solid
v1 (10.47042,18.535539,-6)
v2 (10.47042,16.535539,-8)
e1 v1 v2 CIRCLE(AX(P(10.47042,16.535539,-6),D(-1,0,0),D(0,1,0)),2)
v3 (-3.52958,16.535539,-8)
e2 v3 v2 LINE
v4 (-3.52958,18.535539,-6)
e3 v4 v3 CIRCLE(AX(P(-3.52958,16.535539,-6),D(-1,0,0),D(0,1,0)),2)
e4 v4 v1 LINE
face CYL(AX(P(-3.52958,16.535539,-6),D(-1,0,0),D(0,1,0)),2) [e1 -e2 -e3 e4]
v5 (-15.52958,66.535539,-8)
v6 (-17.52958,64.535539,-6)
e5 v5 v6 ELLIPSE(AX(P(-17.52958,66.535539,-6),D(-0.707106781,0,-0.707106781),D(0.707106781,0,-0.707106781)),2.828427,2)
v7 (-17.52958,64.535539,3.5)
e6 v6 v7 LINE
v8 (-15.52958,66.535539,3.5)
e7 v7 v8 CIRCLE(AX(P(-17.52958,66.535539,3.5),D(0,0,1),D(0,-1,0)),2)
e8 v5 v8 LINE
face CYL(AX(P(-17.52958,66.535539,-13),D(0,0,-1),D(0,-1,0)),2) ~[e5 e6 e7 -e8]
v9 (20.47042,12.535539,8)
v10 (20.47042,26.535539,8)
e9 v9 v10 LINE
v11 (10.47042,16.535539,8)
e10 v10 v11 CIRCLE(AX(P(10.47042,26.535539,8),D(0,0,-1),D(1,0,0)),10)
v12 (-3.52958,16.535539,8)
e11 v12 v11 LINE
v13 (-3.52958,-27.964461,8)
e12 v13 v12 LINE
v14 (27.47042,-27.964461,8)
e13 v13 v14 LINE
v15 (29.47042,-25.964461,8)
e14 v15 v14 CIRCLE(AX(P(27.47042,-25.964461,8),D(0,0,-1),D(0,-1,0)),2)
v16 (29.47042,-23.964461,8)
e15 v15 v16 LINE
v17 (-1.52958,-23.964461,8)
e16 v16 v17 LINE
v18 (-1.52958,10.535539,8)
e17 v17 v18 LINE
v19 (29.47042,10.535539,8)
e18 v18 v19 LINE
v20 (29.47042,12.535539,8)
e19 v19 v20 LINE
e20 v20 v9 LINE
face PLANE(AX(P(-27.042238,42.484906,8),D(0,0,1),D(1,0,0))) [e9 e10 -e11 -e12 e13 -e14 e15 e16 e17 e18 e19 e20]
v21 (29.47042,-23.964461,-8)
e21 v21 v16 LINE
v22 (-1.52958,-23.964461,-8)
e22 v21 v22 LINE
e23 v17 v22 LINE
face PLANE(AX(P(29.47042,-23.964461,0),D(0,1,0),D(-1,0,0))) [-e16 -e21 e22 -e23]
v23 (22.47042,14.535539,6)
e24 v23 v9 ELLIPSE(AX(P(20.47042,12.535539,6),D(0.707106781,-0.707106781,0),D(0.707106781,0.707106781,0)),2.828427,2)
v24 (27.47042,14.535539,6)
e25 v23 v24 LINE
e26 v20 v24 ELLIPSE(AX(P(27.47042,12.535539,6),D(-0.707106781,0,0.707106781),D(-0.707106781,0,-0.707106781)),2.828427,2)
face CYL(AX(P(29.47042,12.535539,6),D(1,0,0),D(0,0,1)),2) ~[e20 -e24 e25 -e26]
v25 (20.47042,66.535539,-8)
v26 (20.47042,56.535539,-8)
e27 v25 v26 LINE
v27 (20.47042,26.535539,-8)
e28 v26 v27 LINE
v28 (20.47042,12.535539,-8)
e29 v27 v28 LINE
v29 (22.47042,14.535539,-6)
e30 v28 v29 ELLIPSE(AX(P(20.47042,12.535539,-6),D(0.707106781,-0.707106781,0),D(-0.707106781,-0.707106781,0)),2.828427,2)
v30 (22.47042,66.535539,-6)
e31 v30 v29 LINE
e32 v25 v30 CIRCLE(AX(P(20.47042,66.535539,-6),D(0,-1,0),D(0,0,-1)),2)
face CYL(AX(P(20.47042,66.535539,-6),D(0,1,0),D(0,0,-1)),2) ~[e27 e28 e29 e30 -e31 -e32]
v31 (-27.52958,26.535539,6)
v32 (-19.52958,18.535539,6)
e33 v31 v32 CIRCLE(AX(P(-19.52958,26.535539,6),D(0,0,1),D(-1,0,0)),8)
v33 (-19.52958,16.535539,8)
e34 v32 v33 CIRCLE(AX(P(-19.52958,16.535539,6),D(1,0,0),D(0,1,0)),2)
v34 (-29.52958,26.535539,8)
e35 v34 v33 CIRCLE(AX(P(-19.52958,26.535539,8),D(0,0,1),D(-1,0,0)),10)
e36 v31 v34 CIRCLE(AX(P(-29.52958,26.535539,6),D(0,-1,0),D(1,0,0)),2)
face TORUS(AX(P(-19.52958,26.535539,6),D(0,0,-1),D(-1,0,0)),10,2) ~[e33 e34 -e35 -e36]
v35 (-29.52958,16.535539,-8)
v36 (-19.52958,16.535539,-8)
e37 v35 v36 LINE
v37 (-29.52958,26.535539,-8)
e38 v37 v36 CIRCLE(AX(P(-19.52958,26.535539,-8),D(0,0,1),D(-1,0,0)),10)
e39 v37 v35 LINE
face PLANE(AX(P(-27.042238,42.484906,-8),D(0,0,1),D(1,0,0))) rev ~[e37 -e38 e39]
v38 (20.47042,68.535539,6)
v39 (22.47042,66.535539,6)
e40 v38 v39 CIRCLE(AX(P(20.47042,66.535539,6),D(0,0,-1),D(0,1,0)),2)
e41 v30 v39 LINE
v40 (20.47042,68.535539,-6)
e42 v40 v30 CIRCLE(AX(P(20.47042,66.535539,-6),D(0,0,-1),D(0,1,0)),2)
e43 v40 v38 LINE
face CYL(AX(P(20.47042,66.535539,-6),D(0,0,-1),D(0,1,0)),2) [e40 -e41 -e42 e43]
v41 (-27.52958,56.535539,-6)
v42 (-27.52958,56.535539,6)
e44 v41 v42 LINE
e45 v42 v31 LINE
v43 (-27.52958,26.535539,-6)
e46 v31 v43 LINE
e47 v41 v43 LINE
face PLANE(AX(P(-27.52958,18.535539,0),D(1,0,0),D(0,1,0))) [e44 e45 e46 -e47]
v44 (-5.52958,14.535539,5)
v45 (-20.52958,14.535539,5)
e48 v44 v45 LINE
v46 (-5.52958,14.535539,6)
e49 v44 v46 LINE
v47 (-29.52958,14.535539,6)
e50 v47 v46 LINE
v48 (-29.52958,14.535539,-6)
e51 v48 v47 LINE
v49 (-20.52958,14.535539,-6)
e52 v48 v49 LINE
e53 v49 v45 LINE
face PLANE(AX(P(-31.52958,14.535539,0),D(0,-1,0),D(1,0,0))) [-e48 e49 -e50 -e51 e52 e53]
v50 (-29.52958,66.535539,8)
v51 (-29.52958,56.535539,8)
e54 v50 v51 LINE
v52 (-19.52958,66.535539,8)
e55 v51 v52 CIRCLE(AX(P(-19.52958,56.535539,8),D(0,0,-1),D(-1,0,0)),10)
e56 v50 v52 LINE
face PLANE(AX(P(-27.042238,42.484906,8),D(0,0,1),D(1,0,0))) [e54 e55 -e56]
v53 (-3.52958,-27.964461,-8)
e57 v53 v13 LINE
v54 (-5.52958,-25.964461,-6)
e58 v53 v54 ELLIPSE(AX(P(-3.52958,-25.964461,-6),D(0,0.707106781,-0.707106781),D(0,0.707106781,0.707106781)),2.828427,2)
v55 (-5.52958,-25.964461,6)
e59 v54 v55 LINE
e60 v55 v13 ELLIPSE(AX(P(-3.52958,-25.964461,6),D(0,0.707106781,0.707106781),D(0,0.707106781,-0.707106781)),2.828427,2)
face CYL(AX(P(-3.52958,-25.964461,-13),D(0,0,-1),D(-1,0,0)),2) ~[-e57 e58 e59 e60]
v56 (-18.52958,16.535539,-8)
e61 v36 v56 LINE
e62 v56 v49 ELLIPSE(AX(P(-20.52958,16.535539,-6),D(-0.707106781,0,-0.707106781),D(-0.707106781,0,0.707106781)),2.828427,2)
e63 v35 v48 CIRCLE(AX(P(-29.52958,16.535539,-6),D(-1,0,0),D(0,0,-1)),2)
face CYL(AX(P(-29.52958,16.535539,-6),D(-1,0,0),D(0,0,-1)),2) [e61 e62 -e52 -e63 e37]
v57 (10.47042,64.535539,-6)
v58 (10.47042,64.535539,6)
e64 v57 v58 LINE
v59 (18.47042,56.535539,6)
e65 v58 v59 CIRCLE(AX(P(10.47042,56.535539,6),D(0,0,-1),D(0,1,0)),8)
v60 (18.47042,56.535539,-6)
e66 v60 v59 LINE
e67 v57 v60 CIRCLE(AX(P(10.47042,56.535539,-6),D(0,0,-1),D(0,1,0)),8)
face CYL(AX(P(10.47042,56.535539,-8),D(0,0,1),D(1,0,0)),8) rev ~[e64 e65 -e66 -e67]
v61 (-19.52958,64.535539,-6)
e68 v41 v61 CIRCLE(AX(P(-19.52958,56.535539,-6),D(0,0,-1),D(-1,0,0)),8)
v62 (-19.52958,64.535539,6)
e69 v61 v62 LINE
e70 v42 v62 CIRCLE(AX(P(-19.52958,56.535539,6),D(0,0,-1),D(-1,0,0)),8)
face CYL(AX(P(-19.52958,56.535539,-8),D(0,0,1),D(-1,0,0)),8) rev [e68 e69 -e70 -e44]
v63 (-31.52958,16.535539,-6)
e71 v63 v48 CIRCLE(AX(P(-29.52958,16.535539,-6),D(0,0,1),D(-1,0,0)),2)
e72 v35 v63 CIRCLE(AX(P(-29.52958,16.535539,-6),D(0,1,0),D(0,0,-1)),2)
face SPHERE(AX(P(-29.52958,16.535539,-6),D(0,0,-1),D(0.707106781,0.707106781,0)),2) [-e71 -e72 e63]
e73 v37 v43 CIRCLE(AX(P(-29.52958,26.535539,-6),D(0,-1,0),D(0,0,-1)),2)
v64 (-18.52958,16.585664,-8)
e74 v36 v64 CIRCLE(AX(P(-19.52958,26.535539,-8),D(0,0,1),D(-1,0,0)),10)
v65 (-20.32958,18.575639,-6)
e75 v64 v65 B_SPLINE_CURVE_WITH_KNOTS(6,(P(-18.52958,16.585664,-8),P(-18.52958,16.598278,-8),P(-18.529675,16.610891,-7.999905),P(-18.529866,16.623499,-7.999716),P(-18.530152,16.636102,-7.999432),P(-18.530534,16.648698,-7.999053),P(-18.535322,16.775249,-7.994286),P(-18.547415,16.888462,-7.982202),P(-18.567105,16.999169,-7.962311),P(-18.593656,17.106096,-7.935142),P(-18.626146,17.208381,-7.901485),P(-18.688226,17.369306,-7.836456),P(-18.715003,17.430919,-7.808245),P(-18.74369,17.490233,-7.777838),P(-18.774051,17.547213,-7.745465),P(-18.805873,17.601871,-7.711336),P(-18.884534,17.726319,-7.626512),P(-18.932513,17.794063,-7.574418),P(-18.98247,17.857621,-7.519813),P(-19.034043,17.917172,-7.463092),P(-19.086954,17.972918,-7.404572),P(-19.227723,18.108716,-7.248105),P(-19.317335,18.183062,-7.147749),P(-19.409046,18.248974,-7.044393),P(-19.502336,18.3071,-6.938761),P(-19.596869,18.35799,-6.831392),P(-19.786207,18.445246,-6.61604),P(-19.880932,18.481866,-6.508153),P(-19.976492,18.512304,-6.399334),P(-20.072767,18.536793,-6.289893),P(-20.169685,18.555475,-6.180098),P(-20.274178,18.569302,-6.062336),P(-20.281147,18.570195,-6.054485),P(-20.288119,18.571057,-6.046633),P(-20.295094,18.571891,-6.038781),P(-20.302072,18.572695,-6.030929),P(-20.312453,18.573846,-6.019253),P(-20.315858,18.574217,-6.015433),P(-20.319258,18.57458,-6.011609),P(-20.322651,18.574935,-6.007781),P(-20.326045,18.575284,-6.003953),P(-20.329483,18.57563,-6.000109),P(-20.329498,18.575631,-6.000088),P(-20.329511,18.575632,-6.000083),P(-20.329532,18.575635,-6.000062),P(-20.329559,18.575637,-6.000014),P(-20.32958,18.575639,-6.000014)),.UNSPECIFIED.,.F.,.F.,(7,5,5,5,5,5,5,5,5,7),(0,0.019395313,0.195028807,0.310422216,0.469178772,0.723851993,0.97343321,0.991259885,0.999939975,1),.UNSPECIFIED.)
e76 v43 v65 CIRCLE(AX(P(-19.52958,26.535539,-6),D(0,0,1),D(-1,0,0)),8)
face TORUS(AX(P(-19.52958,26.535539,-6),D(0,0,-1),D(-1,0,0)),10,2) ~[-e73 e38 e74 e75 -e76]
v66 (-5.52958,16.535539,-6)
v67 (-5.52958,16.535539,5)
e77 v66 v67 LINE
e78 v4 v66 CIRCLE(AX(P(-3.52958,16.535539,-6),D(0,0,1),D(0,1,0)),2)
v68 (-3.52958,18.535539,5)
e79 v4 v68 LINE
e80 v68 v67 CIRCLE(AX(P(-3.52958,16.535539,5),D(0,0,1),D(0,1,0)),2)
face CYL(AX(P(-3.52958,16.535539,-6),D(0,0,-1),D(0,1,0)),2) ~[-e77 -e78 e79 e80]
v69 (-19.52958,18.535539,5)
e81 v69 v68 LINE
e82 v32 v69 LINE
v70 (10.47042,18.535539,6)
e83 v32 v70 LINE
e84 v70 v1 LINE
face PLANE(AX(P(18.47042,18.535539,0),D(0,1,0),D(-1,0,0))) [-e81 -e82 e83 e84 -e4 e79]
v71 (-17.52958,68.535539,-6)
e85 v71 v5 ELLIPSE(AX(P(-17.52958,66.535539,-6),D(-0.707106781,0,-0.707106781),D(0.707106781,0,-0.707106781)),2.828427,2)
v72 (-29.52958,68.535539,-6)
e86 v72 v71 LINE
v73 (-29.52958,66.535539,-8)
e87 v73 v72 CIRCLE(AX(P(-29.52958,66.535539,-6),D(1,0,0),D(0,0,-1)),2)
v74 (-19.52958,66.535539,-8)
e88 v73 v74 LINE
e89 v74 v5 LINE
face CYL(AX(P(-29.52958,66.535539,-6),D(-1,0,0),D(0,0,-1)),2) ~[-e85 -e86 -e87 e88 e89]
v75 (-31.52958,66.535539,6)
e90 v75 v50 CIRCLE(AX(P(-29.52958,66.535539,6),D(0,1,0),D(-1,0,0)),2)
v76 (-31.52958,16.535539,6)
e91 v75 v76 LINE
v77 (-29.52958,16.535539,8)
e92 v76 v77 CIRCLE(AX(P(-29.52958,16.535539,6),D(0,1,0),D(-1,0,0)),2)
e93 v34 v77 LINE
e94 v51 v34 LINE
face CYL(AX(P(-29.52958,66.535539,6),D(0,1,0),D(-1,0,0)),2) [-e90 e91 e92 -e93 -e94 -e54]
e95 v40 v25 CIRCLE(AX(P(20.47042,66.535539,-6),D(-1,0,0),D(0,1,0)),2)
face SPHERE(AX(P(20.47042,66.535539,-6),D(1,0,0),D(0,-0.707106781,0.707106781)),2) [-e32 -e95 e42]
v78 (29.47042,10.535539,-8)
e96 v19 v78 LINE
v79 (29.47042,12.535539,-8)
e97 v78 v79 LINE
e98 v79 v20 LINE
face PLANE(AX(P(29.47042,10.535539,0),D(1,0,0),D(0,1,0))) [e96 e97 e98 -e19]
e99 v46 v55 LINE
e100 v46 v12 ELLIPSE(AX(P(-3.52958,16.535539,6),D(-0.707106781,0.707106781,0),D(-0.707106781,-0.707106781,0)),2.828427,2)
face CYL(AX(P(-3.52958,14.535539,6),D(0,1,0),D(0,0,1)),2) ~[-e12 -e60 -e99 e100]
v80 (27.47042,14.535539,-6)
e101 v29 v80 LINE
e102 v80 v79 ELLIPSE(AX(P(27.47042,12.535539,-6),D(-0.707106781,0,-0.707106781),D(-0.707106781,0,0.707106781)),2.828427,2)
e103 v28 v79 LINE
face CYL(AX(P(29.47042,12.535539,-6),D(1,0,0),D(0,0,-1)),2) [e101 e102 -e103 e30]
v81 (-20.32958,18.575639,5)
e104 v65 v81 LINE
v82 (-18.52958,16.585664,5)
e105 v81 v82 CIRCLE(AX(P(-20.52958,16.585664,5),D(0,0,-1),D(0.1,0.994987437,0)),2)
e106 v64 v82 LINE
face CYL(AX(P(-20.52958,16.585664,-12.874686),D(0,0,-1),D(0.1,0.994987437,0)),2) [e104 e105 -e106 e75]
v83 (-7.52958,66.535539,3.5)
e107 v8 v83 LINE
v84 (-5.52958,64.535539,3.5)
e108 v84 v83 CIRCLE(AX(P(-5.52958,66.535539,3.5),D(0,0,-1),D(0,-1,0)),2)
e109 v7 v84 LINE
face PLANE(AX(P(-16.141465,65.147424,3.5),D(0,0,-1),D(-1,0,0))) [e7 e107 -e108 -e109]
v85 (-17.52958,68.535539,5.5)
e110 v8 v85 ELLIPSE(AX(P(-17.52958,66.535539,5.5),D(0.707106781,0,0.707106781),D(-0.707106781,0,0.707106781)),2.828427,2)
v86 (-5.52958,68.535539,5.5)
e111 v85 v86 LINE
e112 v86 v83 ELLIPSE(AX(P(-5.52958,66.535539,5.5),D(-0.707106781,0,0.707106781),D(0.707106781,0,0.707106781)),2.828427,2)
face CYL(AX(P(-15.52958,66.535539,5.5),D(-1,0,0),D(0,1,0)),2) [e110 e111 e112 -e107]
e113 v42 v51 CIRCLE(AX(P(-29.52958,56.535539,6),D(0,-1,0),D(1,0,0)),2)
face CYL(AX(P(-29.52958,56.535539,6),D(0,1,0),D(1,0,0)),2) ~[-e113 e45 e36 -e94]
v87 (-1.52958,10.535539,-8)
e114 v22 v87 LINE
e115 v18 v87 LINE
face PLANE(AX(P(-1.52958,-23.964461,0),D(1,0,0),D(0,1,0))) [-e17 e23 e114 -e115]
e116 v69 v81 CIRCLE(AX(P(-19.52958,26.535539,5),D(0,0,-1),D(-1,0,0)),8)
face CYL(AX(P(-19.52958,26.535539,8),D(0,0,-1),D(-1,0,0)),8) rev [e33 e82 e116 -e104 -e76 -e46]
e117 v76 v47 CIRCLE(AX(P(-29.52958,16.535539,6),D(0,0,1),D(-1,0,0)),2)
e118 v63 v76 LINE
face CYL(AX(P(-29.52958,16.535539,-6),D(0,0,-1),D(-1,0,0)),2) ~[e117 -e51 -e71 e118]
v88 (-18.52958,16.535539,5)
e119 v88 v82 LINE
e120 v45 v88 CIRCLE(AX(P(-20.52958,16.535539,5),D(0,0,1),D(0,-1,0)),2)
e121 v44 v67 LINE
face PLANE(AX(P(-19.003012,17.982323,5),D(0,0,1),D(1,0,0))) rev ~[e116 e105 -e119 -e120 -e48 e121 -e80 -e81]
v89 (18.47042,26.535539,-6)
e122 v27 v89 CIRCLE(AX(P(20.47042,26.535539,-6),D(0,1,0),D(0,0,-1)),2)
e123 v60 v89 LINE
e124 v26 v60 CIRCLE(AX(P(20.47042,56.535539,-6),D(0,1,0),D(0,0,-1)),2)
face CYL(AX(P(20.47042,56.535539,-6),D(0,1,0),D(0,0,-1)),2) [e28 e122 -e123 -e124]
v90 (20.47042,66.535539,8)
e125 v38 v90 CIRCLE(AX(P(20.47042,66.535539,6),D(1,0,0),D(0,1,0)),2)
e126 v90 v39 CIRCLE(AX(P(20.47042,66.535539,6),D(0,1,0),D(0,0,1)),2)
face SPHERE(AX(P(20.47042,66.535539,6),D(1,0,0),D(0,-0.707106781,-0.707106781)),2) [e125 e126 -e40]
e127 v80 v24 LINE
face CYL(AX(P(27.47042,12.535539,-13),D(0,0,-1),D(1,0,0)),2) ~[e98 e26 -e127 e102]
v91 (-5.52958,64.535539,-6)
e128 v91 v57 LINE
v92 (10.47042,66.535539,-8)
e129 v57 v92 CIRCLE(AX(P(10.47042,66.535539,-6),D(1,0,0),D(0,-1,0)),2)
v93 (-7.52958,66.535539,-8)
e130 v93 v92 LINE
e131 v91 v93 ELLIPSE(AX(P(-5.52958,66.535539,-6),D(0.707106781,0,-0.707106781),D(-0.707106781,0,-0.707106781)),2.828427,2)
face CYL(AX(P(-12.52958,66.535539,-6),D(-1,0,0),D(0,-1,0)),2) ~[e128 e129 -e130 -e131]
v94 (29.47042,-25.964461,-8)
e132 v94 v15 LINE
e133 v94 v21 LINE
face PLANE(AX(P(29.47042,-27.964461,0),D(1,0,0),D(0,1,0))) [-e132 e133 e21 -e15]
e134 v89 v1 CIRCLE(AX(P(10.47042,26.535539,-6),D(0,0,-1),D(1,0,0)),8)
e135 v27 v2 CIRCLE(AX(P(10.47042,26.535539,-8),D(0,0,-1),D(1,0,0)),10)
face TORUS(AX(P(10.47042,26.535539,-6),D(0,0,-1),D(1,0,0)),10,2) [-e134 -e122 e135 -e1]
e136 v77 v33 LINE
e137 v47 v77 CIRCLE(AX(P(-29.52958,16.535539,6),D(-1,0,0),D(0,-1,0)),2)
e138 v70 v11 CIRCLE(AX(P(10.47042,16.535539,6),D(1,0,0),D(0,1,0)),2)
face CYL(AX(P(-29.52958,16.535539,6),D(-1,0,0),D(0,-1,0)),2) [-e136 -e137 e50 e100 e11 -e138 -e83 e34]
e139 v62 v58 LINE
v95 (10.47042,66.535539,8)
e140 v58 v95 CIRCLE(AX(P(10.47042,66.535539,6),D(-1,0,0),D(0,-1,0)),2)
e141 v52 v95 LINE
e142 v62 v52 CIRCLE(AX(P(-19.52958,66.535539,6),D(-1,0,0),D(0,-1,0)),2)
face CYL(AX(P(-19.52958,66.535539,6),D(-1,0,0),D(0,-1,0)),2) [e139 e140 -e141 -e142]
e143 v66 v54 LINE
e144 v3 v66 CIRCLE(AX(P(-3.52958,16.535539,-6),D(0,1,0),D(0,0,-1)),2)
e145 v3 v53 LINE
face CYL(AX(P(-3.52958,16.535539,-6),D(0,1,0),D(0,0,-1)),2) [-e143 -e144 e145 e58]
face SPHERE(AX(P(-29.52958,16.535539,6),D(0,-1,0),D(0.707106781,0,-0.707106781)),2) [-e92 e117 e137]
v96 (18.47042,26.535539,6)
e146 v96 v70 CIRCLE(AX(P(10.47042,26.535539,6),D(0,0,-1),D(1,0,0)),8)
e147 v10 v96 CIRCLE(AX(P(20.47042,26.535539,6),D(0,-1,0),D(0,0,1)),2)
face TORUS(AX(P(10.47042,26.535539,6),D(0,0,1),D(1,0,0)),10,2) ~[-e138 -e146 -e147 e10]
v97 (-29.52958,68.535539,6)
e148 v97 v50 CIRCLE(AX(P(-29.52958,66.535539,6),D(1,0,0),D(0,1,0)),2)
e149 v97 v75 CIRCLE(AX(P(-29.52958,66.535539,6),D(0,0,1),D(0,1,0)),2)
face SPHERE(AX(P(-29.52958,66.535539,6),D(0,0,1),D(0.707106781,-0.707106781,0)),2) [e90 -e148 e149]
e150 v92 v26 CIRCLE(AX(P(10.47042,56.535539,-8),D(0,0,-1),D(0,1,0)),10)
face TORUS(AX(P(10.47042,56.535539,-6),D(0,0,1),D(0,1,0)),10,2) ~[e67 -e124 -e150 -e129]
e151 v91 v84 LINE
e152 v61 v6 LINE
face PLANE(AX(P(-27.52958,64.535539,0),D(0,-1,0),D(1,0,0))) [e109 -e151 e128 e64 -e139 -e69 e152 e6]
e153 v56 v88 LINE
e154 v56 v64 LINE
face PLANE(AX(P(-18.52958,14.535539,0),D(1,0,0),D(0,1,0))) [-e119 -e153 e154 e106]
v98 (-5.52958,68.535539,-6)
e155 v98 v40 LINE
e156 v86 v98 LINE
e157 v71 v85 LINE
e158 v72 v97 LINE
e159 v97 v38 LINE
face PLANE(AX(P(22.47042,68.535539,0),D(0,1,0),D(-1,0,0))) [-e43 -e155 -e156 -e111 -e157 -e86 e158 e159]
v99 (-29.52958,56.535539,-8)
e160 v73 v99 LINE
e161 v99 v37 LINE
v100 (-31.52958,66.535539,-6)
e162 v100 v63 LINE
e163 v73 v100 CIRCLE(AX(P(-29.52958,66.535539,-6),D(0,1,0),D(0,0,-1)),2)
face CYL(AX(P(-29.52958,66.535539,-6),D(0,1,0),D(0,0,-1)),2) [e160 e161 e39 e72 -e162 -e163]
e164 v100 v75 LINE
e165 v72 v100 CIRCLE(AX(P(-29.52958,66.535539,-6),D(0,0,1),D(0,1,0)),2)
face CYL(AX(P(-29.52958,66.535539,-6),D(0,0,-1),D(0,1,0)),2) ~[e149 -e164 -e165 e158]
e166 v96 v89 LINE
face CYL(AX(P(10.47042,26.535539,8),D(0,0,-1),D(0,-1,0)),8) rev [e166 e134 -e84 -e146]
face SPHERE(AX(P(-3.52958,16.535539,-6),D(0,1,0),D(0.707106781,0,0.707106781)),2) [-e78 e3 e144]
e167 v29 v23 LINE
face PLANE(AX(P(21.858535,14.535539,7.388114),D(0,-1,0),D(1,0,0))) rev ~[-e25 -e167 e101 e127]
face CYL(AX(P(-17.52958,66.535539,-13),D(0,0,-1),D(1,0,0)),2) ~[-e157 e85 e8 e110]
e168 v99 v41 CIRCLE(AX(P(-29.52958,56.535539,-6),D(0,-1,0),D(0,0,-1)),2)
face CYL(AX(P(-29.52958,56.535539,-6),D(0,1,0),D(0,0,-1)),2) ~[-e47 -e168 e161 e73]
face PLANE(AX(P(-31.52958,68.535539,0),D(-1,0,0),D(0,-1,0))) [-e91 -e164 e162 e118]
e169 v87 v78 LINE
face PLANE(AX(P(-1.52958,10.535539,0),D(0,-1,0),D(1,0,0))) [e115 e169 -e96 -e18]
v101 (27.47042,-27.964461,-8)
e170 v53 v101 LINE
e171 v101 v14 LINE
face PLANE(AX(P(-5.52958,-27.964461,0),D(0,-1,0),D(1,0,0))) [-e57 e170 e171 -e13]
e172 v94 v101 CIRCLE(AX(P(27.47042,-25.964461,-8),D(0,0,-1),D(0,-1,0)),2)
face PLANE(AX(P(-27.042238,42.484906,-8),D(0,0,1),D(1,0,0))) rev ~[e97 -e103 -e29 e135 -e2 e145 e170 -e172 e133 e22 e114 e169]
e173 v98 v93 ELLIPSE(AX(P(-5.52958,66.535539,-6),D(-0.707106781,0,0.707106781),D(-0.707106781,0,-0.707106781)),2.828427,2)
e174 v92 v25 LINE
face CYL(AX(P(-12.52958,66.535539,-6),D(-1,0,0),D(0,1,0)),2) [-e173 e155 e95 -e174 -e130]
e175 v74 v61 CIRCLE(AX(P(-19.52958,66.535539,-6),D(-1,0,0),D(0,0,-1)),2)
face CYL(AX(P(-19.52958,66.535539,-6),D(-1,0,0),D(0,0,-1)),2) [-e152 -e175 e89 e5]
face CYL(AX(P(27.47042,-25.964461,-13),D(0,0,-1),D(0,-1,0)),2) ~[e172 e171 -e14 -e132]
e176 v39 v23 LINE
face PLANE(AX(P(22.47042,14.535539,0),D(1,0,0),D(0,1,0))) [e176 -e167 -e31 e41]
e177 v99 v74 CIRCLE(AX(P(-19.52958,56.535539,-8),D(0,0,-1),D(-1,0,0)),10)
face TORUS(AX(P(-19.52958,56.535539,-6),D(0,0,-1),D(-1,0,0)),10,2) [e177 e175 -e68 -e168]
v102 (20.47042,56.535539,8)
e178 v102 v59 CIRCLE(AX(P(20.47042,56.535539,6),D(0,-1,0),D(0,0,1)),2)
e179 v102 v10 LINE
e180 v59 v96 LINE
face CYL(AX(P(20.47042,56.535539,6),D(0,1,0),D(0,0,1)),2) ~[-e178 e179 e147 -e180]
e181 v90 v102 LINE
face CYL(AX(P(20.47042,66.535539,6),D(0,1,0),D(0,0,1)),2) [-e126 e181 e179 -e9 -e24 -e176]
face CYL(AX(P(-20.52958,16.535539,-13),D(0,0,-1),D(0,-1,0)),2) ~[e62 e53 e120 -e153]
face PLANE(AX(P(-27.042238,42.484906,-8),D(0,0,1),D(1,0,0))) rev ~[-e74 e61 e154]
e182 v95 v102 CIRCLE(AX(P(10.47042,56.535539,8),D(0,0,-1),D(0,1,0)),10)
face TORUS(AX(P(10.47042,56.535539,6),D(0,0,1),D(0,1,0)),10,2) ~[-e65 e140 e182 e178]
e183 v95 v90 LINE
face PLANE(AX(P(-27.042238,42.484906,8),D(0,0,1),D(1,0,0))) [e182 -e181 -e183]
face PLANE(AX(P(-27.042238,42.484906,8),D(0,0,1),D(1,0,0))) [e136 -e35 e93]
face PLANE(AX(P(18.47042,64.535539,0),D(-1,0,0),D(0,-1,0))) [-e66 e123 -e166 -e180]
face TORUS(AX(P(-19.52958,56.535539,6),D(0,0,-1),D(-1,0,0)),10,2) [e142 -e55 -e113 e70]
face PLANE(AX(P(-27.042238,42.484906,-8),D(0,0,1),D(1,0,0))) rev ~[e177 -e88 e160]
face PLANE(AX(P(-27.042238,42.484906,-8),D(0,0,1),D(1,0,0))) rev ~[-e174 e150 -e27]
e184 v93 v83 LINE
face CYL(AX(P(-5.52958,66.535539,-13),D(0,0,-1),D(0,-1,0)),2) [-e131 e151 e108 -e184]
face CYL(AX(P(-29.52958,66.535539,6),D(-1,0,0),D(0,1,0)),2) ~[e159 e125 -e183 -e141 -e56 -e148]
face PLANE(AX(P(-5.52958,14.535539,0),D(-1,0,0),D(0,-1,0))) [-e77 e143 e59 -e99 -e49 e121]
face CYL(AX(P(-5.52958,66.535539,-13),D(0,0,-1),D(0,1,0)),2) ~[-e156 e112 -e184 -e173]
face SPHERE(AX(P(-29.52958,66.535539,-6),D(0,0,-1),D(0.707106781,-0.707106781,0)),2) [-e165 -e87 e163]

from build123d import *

# Parameters (mm, degrees)
F1_DEPTH      = 8
F2_W          = 13
F2_H          = 4
F2_W_2        = 8
F3_DEPTH      = 8
F4_DEPTH      = 5
F5_DEPTH      = 25
F6_DEPTH      = 3.5
F7_DEPTH      = 25
F8_R          = 8
F9_T1_DEPTH   = 52
F9_T3_DEPTH   = 12
F9_T5_DEPTH   = 12
F9_T7_DEPTH   = 33
F9_T9_DEPTH   = 50
F9_T11_DEPTH  = 8
F9_T13_DEPTH  = 16.5
F9_T15_DEPTH  = 19
F9_T17_DEPTH  = 30
F9_T19_DEPTH  = 50
F9_T21_DEPTH  = 16
F9_T23_DEPTH  = 24
F9_T25_DEPTH  = 17.8746859277
F9_T27_DEPTH  = 18
F9_T29_DEPTH  = 11
F9_T31_DEPTH  = 49.5
F9_T33_DEPTH  = 47.5
F9_T35_DEPTH  = 26
F9_T37_DEPTH  = 9
F9_T39_DEPTH  = 30
F9_T41_DEPTH  = 23
F9_T43_DEPTH  = 14
F9_S47_W      = 2.04
F9_S47_H      = 2.04
F9_T48_DEPTH  = 2.04
F9_S53_W      = 2.04
F9_S53_H      = 2.04
F9_T54_DEPTH  = 2.04
F9_S59_W      = 2.04
F9_S59_H      = 2.04
F9_T60_DEPTH  = 2.04
F9_S65_W      = 2.04
F9_S65_H      = 2.04
F9_T66_DEPTH  = 2.04
F9_S71_W      = 2.04
F9_S71_H      = 2.04
F9_T72_DEPTH  = 2.04
F9_S77_W      = 2.04
F9_S77_H      = 2.04
F9_T78_DEPTH  = 2.04
F9_S83_W      = 2.04
F9_S83_H      = 2.04
F9_T84_DEPTH  = 2.04
F9_T88_ANGLE  = 90
F9_T90_ANGLE  = 150.9012204259
F9_T92_ANGLE  = 90
F9_T94_ANGLE  = 90
F9_T96_ANGLE  = 90
F9_T98_ANGLE  = 90
F9_T100_ANGLE = 90
F9_T102_ANGLE = 90
F9_T107_DEPTH = 12
F9_T111_DEPTH = 57
F9_T119_DEPTH = 57
F9_T124_DEPTH = 12
F9_T131_DEPTH = 16.5
F9_T136_DEPTH = 13
F9_T143_DEPTH = 16.5
F9_T148_DEPTH = 13
F9_T155_DEPTH = 29
F9_T159_DEPTH = 47.5


# Not quite as in the source:
# - a fillet or chamfer that OpenCascade refuses, or shapes differently, is made with other operations: its cross-section is extruded or revolved along the edge and cut away or added


with BuildPart() as f1:
    # F0 (on Top) → F1 (new body, symmetric)
    with BuildSketch(Plane.XY):
        Polygon((29.4704200836, 10.5355388032), (29.4704200836, 14.5355388032), (-5.5295799164, 14.5355388032), (-5.5295799164, -27.9644611968), (29.4704200836, -27.9644611968), (29.4704200836, -23.9644611968), (27.4704200836, -23.9644611968), (-1.5295799164, -23.9644611968), (-1.5295799164, 10.5355388032), (27.4704200836, 10.5355388032), align=None)
    extrude(amount=F1_DEPTH, both=True)

    # F2 (on Top) → F3 (join, symmetric)
    with BuildSketch(Plane.XY):
        Polygon((-27.5295799164, 18.5355388032), (-27.5295799164, 64.5355388032), (-15.5295799164, 64.5355388032), (-15.5295799164, 68.5355388032), (-31.5295799164, 68.5355388032), (-31.5295799164, 14.5355388032), (-18.5295799164, 14.5355388032), (-18.5295799164, 18.5355388032), align=None)
        Polygon((-7.5295799164, 68.5355388032), (-7.5295799164, 64.5355388032), (18.4704200836, 64.5355388032), (18.4704200836, 18.5355388032), (-5.5295799164, 18.5355388032), (-5.5295799164, 14.5355388032), (22.4704200836, 14.5355388032), (22.4704200836, 68.5355388032), align=None)
        with Locations((-12.0295799164, 16.5355388032)):
            Rectangle(F2_W, F2_H)
        with Locations((-11.5295799164, 66.5355388032)):
            Rectangle(F2_W_2, F2_H)
    extrude(amount=F3_DEPTH, both=True)

    # F2 (on Top) → F4 (cut, symmetric)
    with BuildSketch(Plane.XY):
        with Locations((-12.0295799164, 16.5355388032)):
            Rectangle(F2_W, F2_H)
    extrude(amount=F4_DEPTH, both=True, mode=Mode.SUBTRACT)

    # F2 (on Top) → F5 (cut)
    with BuildSketch(Plane.XY):
        with Locations((-12.0295799164, 16.5355388032)):
            Rectangle(F2_W, F2_H)
    extrude(amount=-F5_DEPTH, mode=Mode.SUBTRACT)

    # F2 (on Top) → F6 (cut, symmetric)
    with BuildSketch(Plane.XY):
        with Locations((-11.5295799164, 66.5355388032)):
            Rectangle(F2_W_2, F2_H)
    extrude(amount=F6_DEPTH, both=True, mode=Mode.SUBTRACT)

    # F2 (on Top) → F7 (cut)
    with BuildSketch(Plane.XY):
        with Locations((-11.5295799164, 66.5355388032)):
            Rectangle(F2_W_2, F2_H)
    extrude(amount=-F7_DEPTH, mode=Mode.SUBTRACT)

    # F8
    f8_edges = [f1.edges().sort_by_distance(p)[0] for p in [
        (-27.52958, 64.535539, 0),
        (18.47042, 64.535539, 0),
        (-27.52958, 18.535539, 0),
        (18.47042, 18.535539, 0),
    ]]
    fillet(f8_edges, radius=F8_R)

    # F9: fillet of radius 2 on 44 edges, made by hand

    # F9_s2 → F9_t1 (cut)
    with BuildSketch(Plane.XZ.offset(-66.5355388032)):
        with BuildLine():
            ThreePointArc((20.4704200836, 8), (21.884633646, 7.4142135624), (22.4704200836, 6))
            Line((22.4704200836, 6), (22.4704200836, 8))
            Line((22.4704200836, 8), (20.4704200836, 8))
        make_face()
        with BuildLine():
            ThreePointArc((20.4704200836, -8), (21.884633646, -7.4142135624), (22.4704200836, -6))
            Line((22.4704200836, -6), (22.4704200836, -8))
            Line((22.4704200836, -8), (20.4704200836, -8))
        make_face()
    extrude(amount=F9_T1_DEPTH, mode=Mode.SUBTRACT)

    # F9_s4 → F9_t3 (cut)
    with BuildSketch(Plane.YZ.offset(22.4704200836)):
        with BuildLine():
            ThreePointArc((12.5355388032, 8), (13.9497523656, 7.4142135624), (14.5355388032, 6))
            Line((14.5355388032, 6), (14.5355388032, 8))
            Line((14.5355388032, 8), (12.5355388032, 8))
        make_face()
        with BuildLine():
            ThreePointArc((12.5355388032, -8), (13.9497523656, -7.4142135624), (14.5355388032, -6))
            Line((14.5355388032, -6), (14.5355388032, -8))
            Line((14.5355388032, -8), (12.5355388032, -8))
        make_face()
    extrude(amount=F9_T3_DEPTH, mode=Mode.SUBTRACT)

    # F9_s6 → F9_t5 (cut)
    with BuildSketch(Plane.XY.offset(-6)):
        with BuildLine():
            ThreePointArc((20.4704200836, 68.5355388032), (21.884633646, 67.9497523656), (22.4704200836, 66.5355388032))
            Line((22.4704200836, 66.5355388032), (22.4704200836, 68.5355388032))
            Line((22.4704200836, 68.5355388032), (20.4704200836, 68.5355388032))
        make_face()
        with BuildLine():
            ThreePointArc((-29.5295799164, 68.5355388032), (-30.9437934788, 67.9497523656), (-31.5295799164, 66.5355388032))
            Line((-31.5295799164, 66.5355388032), (-31.5295799164, 68.5355388032))
            Line((-31.5295799164, 68.5355388032), (-29.5295799164, 68.5355388032))
        make_face()
        with BuildLine():
            ThreePointArc((-31.5295799164, 16.5355388032), (-30.9437934788, 15.1213252408), (-29.5295799164, 14.5355388032))
            Line((-29.5295799164, 14.5355388032), (-31.5295799164, 14.5355388032))
            Line((-31.5295799164, 14.5355388032), (-31.5295799164, 16.5355388032))
        make_face()
    extrude(amount=F9_T5_DEPTH, mode=Mode.SUBTRACT)

    # F9_s8 → F9_t7 (cut)
    with BuildSketch(Plane.YZ.offset(-12.5295799164)):
        with BuildLine():
            ThreePointArc((68.5355388032, -6), (67.9497523656, -7.4142135624), (66.5355388032, -8))
            Line((66.5355388032, -8), (68.5355388032, -8))
            Line((68.5355388032, -8), (68.5355388032, -6))
        make_face()
    extrude(amount=F9_T7_DEPTH, mode=Mode.SUBTRACT)

    # F9_s10 → F9_t9 (cut)
    with BuildSketch(Plane.YZ.offset(-29.5295799164)):
        with BuildLine():
            ThreePointArc((68.5355388032, 6), (67.9497523656, 7.4142135624), (66.5355388032, 8))
            Line((66.5355388032, 8), (68.5355388032, 8))
            Line((68.5355388032, 8), (68.5355388032, 6))
        make_face()
    extrude(amount=F9_T9_DEPTH, mode=Mode.SUBTRACT)

    # F9_s12 → F9_t11 (cut)
    with BuildSketch(Plane.YZ.offset(-15.5295799164)):
        with BuildLine():
            ThreePointArc((68.5355388032, 5.5), (67.9497523656, 4.0857864376), (66.5355388032, 3.5))
            Line((66.5355388032, 3.5), (68.5355388032, 3.5))
            Line((68.5355388032, 3.5), (68.5355388032, 5.5))
        make_face()
    extrude(amount=F9_T11_DEPTH, mode=Mode.SUBTRACT)

    # F9_s14 → F9_t13 (cut)
    with BuildSketch(Plane.XY.offset(-13)):
        with BuildLine():
            ThreePointArc((-15.5295799164, 66.5355388032), (-16.115366354, 67.9497523656), (-17.5295799164, 68.5355388032))
            Line((-17.5295799164, 68.5355388032), (-15.5295799164, 68.5355388032))
            Line((-15.5295799164, 68.5355388032), (-15.5295799164, 66.5355388032))
        make_face()
        with BuildLine():
            ThreePointArc((-5.5295799164, 68.5355388032), (-6.9437934788, 67.9497523656), (-7.5295799164, 66.5355388032))
            Line((-7.5295799164, 66.5355388032), (-7.5295799164, 68.5355388032))
            Line((-7.5295799164, 68.5355388032), (-5.5295799164, 68.5355388032))
        make_face()
        with BuildLine():
            ThreePointArc((-5.5295799164, 64.5355388032), (-6.9437934788, 65.1213252408), (-7.5295799164, 66.5355388032))
            Line((-7.5295799164, 66.5355388032), (-7.5295799164, 64.5355388032))
            Line((-7.5295799164, 64.5355388032), (-5.5295799164, 64.5355388032))
        make_face()
        with BuildLine():
            ThreePointArc((-17.5295799164, 64.5355388032), (-16.115366354, 65.1213252408), (-15.5295799164, 66.5355388032))
            Line((-15.5295799164, 66.5355388032), (-15.5295799164, 64.5355388032))
            Line((-15.5295799164, 64.5355388032), (-17.5295799164, 64.5355388032))
        make_face()
    extrude(amount=F9_T13_DEPTH, mode=Mode.SUBTRACT)

    # F9_s16 → F9_t15 (cut)
    with BuildSketch(Plane.YZ.offset(-29.5295799164)):
        with BuildLine():
            ThreePointArc((66.5355388032, -8), (67.9497523656, -7.4142135624), (68.5355388032, -6))
            Line((68.5355388032, -6), (68.5355388032, -8))
            Line((68.5355388032, -8), (66.5355388032, -8))
        make_face()
    extrude(amount=F9_T15_DEPTH, mode=Mode.SUBTRACT)

    # F9_s18 → F9_t17 (cut)
    with BuildSketch(Plane.XZ.offset(-56.5355388032)):
        with BuildLine():
            ThreePointArc((-29.5295799164, -8), (-28.115366354, -7.4142135624), (-27.5295799164, -6))
            Line((-27.5295799164, -6), (-27.5295799164, -8))
            Line((-27.5295799164, -8), (-29.5295799164, -8))
        make_face()
        with BuildLine():
            ThreePointArc((20.4704200836, -8), (19.0562065212, -7.4142135624), (18.4704200836, -6))
            Line((18.4704200836, -6), (18.4704200836, -8))
            Line((18.4704200836, -8), (20.4704200836, -8))
        make_face()
        with BuildLine():
            ThreePointArc((-27.5295799164, 6), (-28.115366354, 7.4142135624), (-29.5295799164, 8))
            Line((-29.5295799164, 8), (-27.5295799164, 8))
            Line((-27.5295799164, 8), (-27.5295799164, 6))
        make_face()
        with BuildLine():
            ThreePointArc((20.4704200836, 8), (19.0562065212, 7.4142135624), (18.4704200836, 6))
            Line((18.4704200836, 6), (18.4704200836, 8))
            Line((18.4704200836, 8), (20.4704200836, 8))
        make_face()
    extrude(amount=F9_T17_DEPTH, mode=Mode.SUBTRACT)

    # F9_s20 → F9_t19 (cut)
    with BuildSketch(Plane.XZ.offset(-66.5355388032)):
        with BuildLine():
            ThreePointArc((-29.5295799164, -8), (-30.9437934788, -7.4142135624), (-31.5295799164, -6))
            Line((-31.5295799164, -6), (-31.5295799164, -8))
            Line((-31.5295799164, -8), (-29.5295799164, -8))
        make_face()
        with BuildLine():
            ThreePointArc((-31.5295799164, 6), (-30.9437934788, 7.4142135624), (-29.5295799164, 8))
            Line((-29.5295799164, 8), (-31.5295799164, 8))
            Line((-31.5295799164, 8), (-31.5295799164, 6))
        make_face()
    extrude(amount=F9_T19_DEPTH, mode=Mode.SUBTRACT)

    # F9_s22 → F9_t21 (cut)
    with BuildSketch(Plane.YZ.offset(-29.5295799164)):
        with BuildLine():
            ThreePointArc((16.5355388032, -8), (15.1213252408, -7.4142135624), (14.5355388032, -6))
            Line((14.5355388032, -6), (14.5355388032, -8))
            Line((14.5355388032, -8), (16.5355388032, -8))
        make_face()
    extrude(amount=F9_T21_DEPTH, mode=Mode.SUBTRACT)

    # F9_s24 → F9_t23 (cut)
    with BuildSketch(Plane.YZ.offset(-29.5295799164)):
        with BuildLine():
            ThreePointArc((14.5355388032, 6), (15.1213252408, 7.4142135624), (16.5355388032, 8))
            Line((16.5355388032, 8), (14.5355388032, 8))
            Line((14.5355388032, 8), (14.5355388032, 6))
        make_face()
    extrude(amount=F9_T23_DEPTH, mode=Mode.SUBTRACT)

    # F9_s26 → F9_t25 (cut)
    with BuildSketch(Plane.XY.offset(-12.8746859277)):
        with BuildLine():
            ThreePointArc((-20.3295799164, 18.5756393063), (-19.046340219, 17.9273052186), (-18.5295799164, 16.5856644321))
            Line((-18.5295799164, 16.5856644321), (-18.3295799164, 16.5856644321))
            Line((-18.3295799164, 16.5856644321), (-18.3295799164, 18.5355388032))
            Line((-18.3295799164, 18.5355388032), (-18.5295799164, 18.7355388032))
            ThreePointArc((-18.5295799164, 18.7355388032), (-19.5295799164, 18.7355388032), (-20.3095799164, 18.7746367938))
            Line((-20.3095799164, 18.7746367938), (-20.3295799164, 18.5756393063))
        make_face()
    extrude(amount=F9_T25_DEPTH, mode=Mode.SUBTRACT)

    # F9_s28 → F9_t27 (cut)
    with BuildSketch(Plane.XY.offset(-13)):
        with BuildLine():
            ThreePointArc((-20.5295799164, 14.5355388032), (-19.115366354, 15.1213252408), (-18.5295799164, 16.5355388032))
            Line((-18.5295799164, 16.5355388032), (-18.5295799164, 14.5355388032))
            Line((-18.5295799164, 14.5355388032), (-20.5295799164, 14.5355388032))
        make_face()
    extrude(amount=F9_T27_DEPTH, mode=Mode.SUBTRACT)

    # F9_s30 → F9_t29 (cut)
    with BuildSketch(Plane.XY.offset(-6)):
        with BuildLine():
            ThreePointArc((-3.5295799164, 18.5355388032), (-4.9437934788, 17.9497523656), (-5.5295799164, 16.5355388032))
            Line((-5.5295799164, 16.5355388032), (-5.5295799164, 18.5355388032))
            Line((-5.5295799164, 18.5355388032), (-3.5295799164, 18.5355388032))
        make_face()
    extrude(amount=F9_T29_DEPTH, mode=Mode.SUBTRACT)

    # F9_s32 → F9_t31 (cut)
    with BuildSketch(Plane.XZ.offset(-16.5355388032)):
        with BuildLine():
            ThreePointArc((-3.5295799164, -8), (-4.9437934788, -7.4142135624), (-5.5295799164, -6))
            Line((-5.5295799164, -6), (-5.5295799164, -8))
            Line((-5.5295799164, -8), (-3.5295799164, -8))
        make_face()
    extrude(amount=F9_T31_DEPTH, mode=Mode.SUBTRACT)

    # F9_s34 → F9_t33 (cut)
    with BuildSketch(Plane.XZ.offset(-14.5355388032)):
        with BuildLine():
            ThreePointArc((-3.5295799164, 8), (-4.9437934788, 7.4142135624), (-5.5295799164, 6))
            Line((-5.5295799164, 6), (-5.5295799164, 8))
            Line((-5.5295799164, 8), (-3.5295799164, 8))
        make_face()
    extrude(amount=F9_T33_DEPTH, mode=Mode.SUBTRACT)

    # F9_s36 → F9_t35 (cut)
    with BuildSketch(Plane.XY.offset(-13)):
        with BuildLine():
            ThreePointArc((27.4704200836, -27.9644611968), (28.884633646, -27.3786747592), (29.4704200836, -25.9644611968))
            Line((29.4704200836, -25.9644611968), (29.4704200836, -27.9644611968))
            Line((29.4704200836, -27.9644611968), (27.4704200836, -27.9644611968))
        make_face()
        with BuildLine():
            ThreePointArc((-5.5295799164, -25.9644611968), (-4.9437934788, -27.3786747592), (-3.5295799164, -27.9644611968))
            Line((-3.5295799164, -27.9644611968), (-5.5295799164, -27.9644611968))
            Line((-5.5295799164, -27.9644611968), (-5.5295799164, -25.9644611968))
        make_face()
        with BuildLine():
            ThreePointArc((29.4704200836, 12.5355388032), (28.884633646, 13.9497523656), (27.4704200836, 14.5355388032))
            Line((27.4704200836, 14.5355388032), (29.4704200836, 14.5355388032))
            Line((29.4704200836, 14.5355388032), (29.4704200836, 12.5355388032))
        make_face()
    extrude(amount=F9_T35_DEPTH, mode=Mode.SUBTRACT)

    # F9_s38 → F9_t37 (cut)
    with BuildSketch(Plane.YZ.offset(-19.5295799164)):
        with BuildLine():
            ThreePointArc((66.5355388032, -8), (65.1213252408, -7.4142135624), (64.5355388032, -6))
            Line((64.5355388032, -6), (64.5355388032, -8))
            Line((64.5355388032, -8), (66.5355388032, -8))
        make_face()
    extrude(amount=F9_T37_DEPTH, mode=Mode.SUBTRACT)

    # F9_s40 → F9_t39 (cut)
    with BuildSketch(Plane.YZ.offset(-19.5295799164)):
        with BuildLine():
            ThreePointArc((64.5355388032, 6), (65.1213252408, 7.4142135624), (66.5355388032, 8))
            Line((66.5355388032, 8), (64.5355388032, 8))
            Line((64.5355388032, 8), (64.5355388032, 6))
        make_face()
        with BuildLine():
            ThreePointArc((18.5355388032, 6), (17.9497523656, 7.4142135624), (16.5355388032, 8))
            Line((16.5355388032, 8), (18.5355388032, 8))
            Line((18.5355388032, 8), (18.5355388032, 6))
        make_face()
    extrude(amount=F9_T39_DEPTH, mode=Mode.SUBTRACT)

    # F9_s42 → F9_t41 (cut)
    with BuildSketch(Plane.YZ.offset(-12.5295799164)):
        with BuildLine():
            ThreePointArc((64.5355388032, -6), (65.1213252408, -7.4142135624), (66.5355388032, -8))
            Line((66.5355388032, -8), (64.5355388032, -8))
            Line((64.5355388032, -8), (64.5355388032, -6))
        make_face()
    extrude(amount=F9_T41_DEPTH, mode=Mode.SUBTRACT)

    # F9_s44 → F9_t43 (cut)
    with BuildSketch(Plane.YZ.offset(-3.5295799164)):
        with BuildLine():
            ThreePointArc((18.5355388032, -6), (17.9497523656, -7.4142135624), (16.5355388032, -8))
            Line((16.5355388032, -8), (18.5355388032, -8))
            Line((18.5355388032, -8), (18.5355388032, -6))
        make_face()
    extrude(amount=F9_T43_DEPTH, mode=Mode.SUBTRACT)


with BuildPart() as f9_tool46:
    # F9_s47 → F9_t48 (new body)
    with BuildSketch(Plane.YZ.offset(20.4704200836)):
        with Locations((67.5555388032, 7.02)):
            Rectangle(F9_S47_W, F9_S47_H)
    extrude(amount=F9_T48_DEPTH)

    # F9_s49 → F9_t50 (revolve, cut)
    with BuildSketch(Plane(origin=(20.4704200836, 66.5355388032, 6), x_dir=(0, -0.7071067812, -0.7071067812), z_dir=(0, -0.7071067812, 0.7071067812))):
        with BuildLine():
            ThreePointArc((0, -2), (2, 0), (0, 2))
            Line((0, 2), (0, -2))
        make_face()
    revolve(axis=Axis((20.4704200836, 66.5355388032, 6), (1, 0, 0)), mode=Mode.SUBTRACT)


with BuildPart() as f1_1:
    add(f1.part)

    # F9_t45: cut F9_tool46
    add(f9_tool46.part, mode=Mode.SUBTRACT)


with BuildPart() as f9_tool52:
    # F9_s53 → F9_t54 (new body)
    with BuildSketch(Plane.YZ.offset(20.4704200836)):
        with Locations((67.5555388032, -7.02)):
            Rectangle(F9_S53_W, F9_S53_H)
    extrude(amount=F9_T54_DEPTH)

    # F9_s55 → F9_t56 (revolve, cut)
    with BuildSketch(Plane(origin=(20.4704200836, 66.5355388032, -6), x_dir=(0, -0.7071067812, 0.7071067812), z_dir=(0, 0.7071067812, 0.7071067812))):
        with BuildLine():
            ThreePointArc((0, -2), (2, 0), (0, 2))
            Line((0, 2), (0, -2))
        make_face()
    revolve(axis=Axis((20.4704200836, 66.5355388032, -6), (1, 0, 0)), mode=Mode.SUBTRACT)


with BuildPart() as f1_2:
    add(f1_1.part)

    # F9_t51: cut F9_tool52
    add(f9_tool52.part, mode=Mode.SUBTRACT)


with BuildPart() as f9_tool58:
    # F9_s59 → F9_t60 (new body)
    with BuildSketch(Plane.XY.offset(6)):
        with Locations((-30.5495799164, 67.5555388032)):
            Rectangle(F9_S59_W, F9_S59_H)
    extrude(amount=F9_T60_DEPTH)

    # F9_s61 → F9_t62 (revolve, cut)
    with BuildSketch(Plane(origin=(-29.5295799164, 66.5355388032, 6), x_dir=(0.7071067812, -0.7071067812, 0), z_dir=(-0.7071067812, -0.7071067812, 0))):
        with BuildLine():
            ThreePointArc((0, -2), (2, 0), (0, 2))
            Line((0, 2), (0, -2))
        make_face()
    revolve(axis=Axis((-29.5295799164, 66.5355388032, 6), (0, 0, 1)), mode=Mode.SUBTRACT)


with BuildPart() as f1_3:
    add(f1_2.part)

    # F9_t57: cut F9_tool58
    add(f9_tool58.part, mode=Mode.SUBTRACT)


with BuildPart() as f9_tool64:
    # F9_s65 → F9_t66 (new body)
    with BuildSketch(Plane.XY.offset(-6)):
        with Locations((-30.5495799164, 67.5555388032)):
            Rectangle(F9_S65_W, F9_S65_H)
    extrude(amount=-F9_T66_DEPTH)

    # F9_s67 → F9_t68 (revolve, cut)
    with BuildSketch(Plane(origin=(-29.5295799164, 66.5355388032, -6), x_dir=(0.7071067812, -0.7071067812, 0), z_dir=(0.7071067812, 0.7071067812, 0))):
        with BuildLine():
            ThreePointArc((0, -2), (2, 0), (0, 2))
            Line((0, 2), (0, -2))
        make_face()
    revolve(axis=Axis((-29.5295799164, 66.5355388032, -6), (0, 0, -1)), mode=Mode.SUBTRACT)


with BuildPart() as f1_4:
    add(f1_3.part)

    # F9_t63: cut F9_tool64
    add(f9_tool64.part, mode=Mode.SUBTRACT)


with BuildPart() as f9_tool70:
    # F9_s71 → F9_t72 (new body)
    with BuildSketch(Plane.XY.offset(-6)):
        with Locations((-30.5495799164, 15.5155388032)):
            Rectangle(F9_S71_W, F9_S71_H)
    extrude(amount=-F9_T72_DEPTH)

    # F9_s73 → F9_t74 (revolve, cut)
    with BuildSketch(Plane(origin=(-29.5295799164, 16.5355388032, -6), x_dir=(0.7071067812, 0.7071067812, 0), z_dir=(-0.7071067812, 0.7071067812, 0))):
        with BuildLine():
            ThreePointArc((0, -2), (2, 0), (0, 2))
            Line((0, 2), (0, -2))
        make_face()
    revolve(axis=Axis((-29.5295799164, 16.5355388032, -6), (0, 0, -1)), mode=Mode.SUBTRACT)


with BuildPart() as f1_5:
    add(f1_4.part)

    # F9_t69: cut F9_tool70
    add(f9_tool70.part, mode=Mode.SUBTRACT)


with BuildPart() as f9_tool76:
    # F9_s77 → F9_t78 (new body)
    with BuildSketch(Plane.XZ.offset(-16.5355388032)):
        with Locations((-30.5495799164, 7.02)):
            Rectangle(F9_S77_W, F9_S77_H)
    extrude(amount=F9_T78_DEPTH)

    # F9_s79 → F9_t80 (revolve, cut)
    with BuildSketch(Plane(origin=(-29.5295799164, 16.5355388032, 6), x_dir=(0.7071067812, 0, -0.7071067812), z_dir=(-0.7071067812, 0, -0.7071067812))):
        with BuildLine():
            ThreePointArc((0, -2), (2, 0), (0, 2))
            Line((0, 2), (0, -2))
        make_face()
    revolve(axis=Axis((-29.5295799164, 16.5355388032, 6), (0, -1, 0)), mode=Mode.SUBTRACT)


with BuildPart() as f1_6:
    add(f1_5.part)

    # F9_t75: cut F9_tool76
    add(f9_tool76.part, mode=Mode.SUBTRACT)


with BuildPart() as f9_tool82:
    # F9_s83 → F9_t84 (new body)
    with BuildSketch(Plane.XZ.offset(-16.5355388032)):
        with Locations((-4.5495799164, -7.02)):
            Rectangle(F9_S83_W, F9_S83_H)
    extrude(amount=-F9_T84_DEPTH)

    # F9_s85 → F9_t86 (revolve, cut)
    with BuildSketch(Plane(origin=(-3.5295799164, 16.5355388032, -6), x_dir=(0.7071067812, 0, 0.7071067812), z_dir=(-0.7071067812, 0, 0.7071067812))):
        with BuildLine():
            ThreePointArc((0, -2), (2, 0), (0, 2))
            Line((0, 2), (0, -2))
        make_face()
    revolve(axis=Axis((-3.5295799164, 16.5355388032, -6), (0, 1, 0)), mode=Mode.SUBTRACT)


with BuildPart() as f1_7:
    add(f1_6.part)

    # F9_t81: cut F9_tool82
    add(f9_tool82.part, mode=Mode.SUBTRACT)

    # F9_s87 → F9_t88 (revolve, cut)
    with BuildSketch(Plane.XZ.offset(-56.5355388032)):
        with BuildLine():
            ThreePointArc((-29.5295799164, -8), (-28.115366354, -7.4142135624), (-27.5295799164, -6))
            Line((-27.5295799164, -6), (-27.5295799164, -8))
            Line((-27.5295799164, -8), (-29.5295799164, -8))
        make_face()
    revolve(axis=Axis((-19.5295799164, 56.5355388032, -8), (0, 0, -1)), revolution_arc=F9_T88_ANGLE, mode=Mode.SUBTRACT)

    # F9_s89 → F9_t90 (revolve, cut)
    with BuildSketch(Plane.XZ.offset(-26.5355388032)):
        with BuildLine():
            ThreePointArc((-29.5295799164, -8), (-28.115366354, -7.4142135624), (-27.5295799164, -6))
            Line((-27.5295799164, -6), (-27.5295799164, -8))
            Line((-27.5295799164, -8), (-29.5295799164, -8))
        make_face()
    revolve(axis=Axis((-19.5295799164, 26.5355388032, -8), (0, 0, 1)), revolution_arc=F9_T90_ANGLE, mode=Mode.SUBTRACT)

    # F9_s91 → F9_t92 (revolve, cut)
    with BuildSketch(Plane.XZ.offset(-56.5355388032)):
        with BuildLine():
            ThreePointArc((-27.5295799164, 6), (-28.115366354, 7.4142135624), (-29.5295799164, 8))
            Line((-29.5295799164, 8), (-27.5295799164, 8))
            Line((-27.5295799164, 8), (-27.5295799164, 6))
        make_face()
    revolve(axis=Axis((-19.5295799164, 56.5355388032, 8), (0, 0, -1)), revolution_arc=F9_T92_ANGLE, mode=Mode.SUBTRACT)

    # F9_s93 → F9_t94 (revolve, cut)
    with BuildSketch(Plane.XZ.offset(-26.5355388032)):
        with BuildLine():
            ThreePointArc((-27.5295799164, 6), (-28.115366354, 7.4142135624), (-29.5295799164, 8))
            Line((-29.5295799164, 8), (-27.5295799164, 8))
            Line((-27.5295799164, 8), (-27.5295799164, 6))
        make_face()
    revolve(axis=Axis((-19.5295799164, 26.5355388032, 8), (0, 0, 1)), revolution_arc=F9_T94_ANGLE, mode=Mode.SUBTRACT)

    # F9_s95 → F9_t96 (revolve, cut)
    with BuildSketch(Plane.XZ.offset(-26.5355388032)):
        with BuildLine():
            ThreePointArc((20.4704200836, 8), (19.0562065212, 7.4142135624), (18.4704200836, 6))
            Line((18.4704200836, 6), (18.4704200836, 8))
            Line((18.4704200836, 8), (20.4704200836, 8))
        make_face()
    revolve(axis=Axis((10.4704200836, 26.5355388032, 8), (0, 0, -1)), revolution_arc=F9_T96_ANGLE, mode=Mode.SUBTRACT)

    # F9_s97 → F9_t98 (revolve, cut)
    with BuildSketch(Plane.YZ.offset(10.4704200836)):
        with BuildLine():
            ThreePointArc((66.5355388032, 8), (65.1213252408, 7.4142135624), (64.5355388032, 6))
            Line((64.5355388032, 6), (64.5355388032, 8))
            Line((64.5355388032, 8), (66.5355388032, 8))
        make_face()
    revolve(axis=Axis((10.4704200836, 56.5355388032, 8), (0, 0, -1)), revolution_arc=F9_T98_ANGLE, mode=Mode.SUBTRACT)

    # F9_s99 → F9_t100 (revolve, cut)
    with BuildSketch(Plane.YZ.offset(10.4704200836)):
        with BuildLine():
            ThreePointArc((64.5355388032, -6), (65.1213252408, -7.4142135624), (66.5355388032, -8))
            Line((66.5355388032, -8), (64.5355388032, -8))
            Line((64.5355388032, -8), (64.5355388032, -6))
        make_face()
    revolve(axis=Axis((10.4704200836, 56.5355388032, -8), (0, 0, -1)), revolution_arc=F9_T100_ANGLE, mode=Mode.SUBTRACT)

    # F9_s101 → F9_t102 (revolve, cut)
    with BuildSketch(Plane.XZ.offset(-26.5355388032)):
        with BuildLine():
            ThreePointArc((20.4704200836, -8), (19.0562065212, -7.4142135624), (18.4704200836, -6))
            Line((18.4704200836, -6), (18.4704200836, -8))
            Line((18.4704200836, -8), (20.4704200836, -8))
        make_face()
    revolve(axis=Axis((10.4704200836, 26.5355388032, -8), (0, 0, -1)), revolution_arc=F9_T102_ANGLE, mode=Mode.SUBTRACT)


with BuildPart() as f9_tool105:
    # F9_s106 → F9_t107 (new body)
    with BuildSketch(Plane.YZ.offset(29.4704200836)):
        with BuildLine():
            ThreePointArc((12.5355388032, 8), (13.9497523656, 7.4142135624), (14.5355388032, 6))
            Line((14.5355388032, 6), (14.5355388032, 8))
            Line((14.5355388032, 8), (12.5355388032, 8))
        make_face()
    extrude(amount=-F9_T107_DEPTH)

    split(bisect_by=Plane.YZ.offset(22.4704200836), keep=Keep.BOTTOM)


with BuildPart() as f9_tool109:
    # F9_s110 → F9_t111 (new body)
    with BuildSketch(Plane.XZ.offset(-9.5355388032)):
        with BuildLine():
            ThreePointArc((20.4704200836, 8), (21.884633646, 7.4142135624), (22.4704200836, 6))
            Line((22.4704200836, 6), (22.4704200836, 8))
            Line((22.4704200836, 8), (20.4704200836, 8))
        make_face()
    extrude(amount=-F9_T111_DEPTH)

    split(bisect_by=Plane.XZ.offset(-14.5355388032), keep=Keep.TOP)

    split(bisect_by=Plane.XZ.offset(-10.5355388032), keep=Keep.BOTTOM)


with BuildPart() as f9_tool105_1:
    add(f9_tool105.part)

    # F9_t114: intersect F9_tool109
    add(f9_tool109.part, mode=Mode.INTERSECT)


with BuildPart() as f1_8:
    add(f1_7.part)

    # F9_t103: cut F9_tool105
    add(f9_tool105_1.part, mode=Mode.SUBTRACT)


with BuildPart() as f9_tool117:
    # F9_s118 → F9_t119 (new body)
    with BuildSketch(Plane.XZ.offset(-9.5355388032)):
        with BuildLine():
            ThreePointArc((20.4704200836, -8), (21.884633646, -7.4142135624), (22.4704200836, -6))
            Line((22.4704200836, -6), (22.4704200836, -8))
            Line((22.4704200836, -8), (20.4704200836, -8))
        make_face()
    extrude(amount=-F9_T119_DEPTH)

    split(bisect_by=Plane.XZ.offset(-14.5355388032), keep=Keep.TOP)

    split(bisect_by=Plane.XZ.offset(-10.5355388032), keep=Keep.BOTTOM)


with BuildPart() as f9_tool122:
    # F9_s123 → F9_t124 (new body)
    with BuildSketch(Plane.YZ.offset(29.4704200836)):
        with BuildLine():
            ThreePointArc((12.5355388032, -8), (13.9497523656, -7.4142135624), (14.5355388032, -6))
            Line((14.5355388032, -6), (14.5355388032, -8))
            Line((14.5355388032, -8), (12.5355388032, -8))
        make_face()
    extrude(amount=-F9_T124_DEPTH)

    split(bisect_by=Plane.YZ.offset(22.4704200836), keep=Keep.BOTTOM)


with BuildPart() as f9_tool117_1:
    add(f9_tool117.part)

    # F9_t126: intersect F9_tool122
    add(f9_tool122.part, mode=Mode.INTERSECT)


with BuildPart() as f1_9:
    add(f1_8.part)

    # F9_t115: cut F9_tool117
    add(f9_tool117_1.part, mode=Mode.SUBTRACT)


with BuildPart() as f9_tool129:
    # F9_s130 → F9_t131 (new body)
    with BuildSketch(Plane.XY.offset(8.5)):
        with BuildLine():
            ThreePointArc((-5.5295799164, 68.5355388032), (-6.9437934788, 67.9497523656), (-7.5295799164, 66.5355388032))
            Line((-7.5295799164, 66.5355388032), (-7.5295799164, 68.5355388032))
            Line((-7.5295799164, 68.5355388032), (-5.5295799164, 68.5355388032))
        make_face()
    extrude(amount=-F9_T131_DEPTH)

    split(bisect_by=Plane.XY.offset(8), keep=Keep.BOTTOM)

    split(bisect_by=Plane.XY.offset(3.5), keep=Keep.TOP)


with BuildPart() as f9_tool134:
    # F9_s135 → F9_t136 (new body)
    with BuildSketch(Plane.YZ.offset(-2.5295799164)):
        with BuildLine():
            ThreePointArc((68.5355388032, 5.5), (67.9497523656, 4.0857864376), (66.5355388032, 3.5))
            Line((66.5355388032, 3.5), (68.5355388032, 3.5))
            Line((68.5355388032, 3.5), (68.5355388032, 5.5))
        make_face()
    extrude(amount=-F9_T136_DEPTH)

    split(bisect_by=Plane.YZ.offset(-7.5295799164), keep=Keep.TOP)


with BuildPart() as f9_tool129_1:
    add(f9_tool129.part)

    # F9_t138: intersect F9_tool134
    add(f9_tool134.part, mode=Mode.INTERSECT)


with BuildPart() as f1_10:
    add(f1_9.part)

    # F9_t127: cut F9_tool129
    add(f9_tool129_1.part, mode=Mode.SUBTRACT)


with BuildPart() as f9_tool141:
    # F9_s142 → F9_t143 (new body)
    with BuildSketch(Plane.XY.offset(8.5)):
        with BuildLine():
            ThreePointArc((-15.5295799164, 66.5355388032), (-16.115366354, 67.9497523656), (-17.5295799164, 68.5355388032))
            Line((-17.5295799164, 68.5355388032), (-15.5295799164, 68.5355388032))
            Line((-15.5295799164, 68.5355388032), (-15.5295799164, 66.5355388032))
        make_face()
    extrude(amount=-F9_T143_DEPTH)

    split(bisect_by=Plane.XY.offset(8), keep=Keep.BOTTOM)

    split(bisect_by=Plane.XY.offset(3.5), keep=Keep.TOP)


with BuildPart() as f9_tool146:
    # F9_s147 → F9_t148 (new body)
    with BuildSketch(Plane.YZ.offset(-7.5295799164)):
        with BuildLine():
            ThreePointArc((68.5355388032, 5.5), (67.9497523656, 4.0857864376), (66.5355388032, 3.5))
            Line((66.5355388032, 3.5), (68.5355388032, 3.5))
            Line((68.5355388032, 3.5), (68.5355388032, 5.5))
        make_face()
    extrude(amount=-F9_T148_DEPTH)

    split(bisect_by=Plane.YZ.offset(-15.5295799164), keep=Keep.BOTTOM)


with BuildPart() as f9_tool141_1:
    add(f9_tool141.part)

    # F9_t150: intersect F9_tool146
    add(f9_tool146.part, mode=Mode.INTERSECT)


with BuildPart() as f1_11:
    add(f1_10.part)

    # F9_t139: cut F9_tool141
    add(f9_tool141_1.part, mode=Mode.SUBTRACT)


with BuildPart() as f9_tool153:
    # F9_s154 → F9_t155 (new body)
    with BuildSketch(Plane.YZ.offset(-29.5295799164)):
        with BuildLine():
            ThreePointArc((14.5355388032, 6), (15.1213252408, 7.4142135624), (16.5355388032, 8))
            Line((16.5355388032, 8), (14.5355388032, 8))
            Line((14.5355388032, 8), (14.5355388032, 6))
        make_face()
    extrude(amount=F9_T155_DEPTH)

    split(bisect_by=Plane.YZ.offset(-5.5295799164), keep=Keep.TOP)


with BuildPart() as f9_tool157:
    # F9_s158 → F9_t159 (new body)
    with BuildSketch(Plane.XZ.offset(-19.5355388032)):
        with BuildLine():
            ThreePointArc((-3.5295799164, 8), (-4.9437934788, 7.4142135624), (-5.5295799164, 6))
            Line((-5.5295799164, 6), (-5.5295799164, 8))
            Line((-5.5295799164, 8), (-3.5295799164, 8))
        make_face()
    extrude(amount=F9_T159_DEPTH)

    split(bisect_by=Plane.XZ.offset(-18.5355388032), keep=Keep.TOP)

    split(bisect_by=Plane.XZ.offset(-14.5355388032), keep=Keep.BOTTOM)


with BuildPart() as f9_tool153_1:
    add(f9_tool153.part)

    # F9_t162: intersect F9_tool157
    add(f9_tool157.part, mode=Mode.INTERSECT)


with BuildPart() as f1_12:
    add(f1_11.part)

    # F9_t151: cut F9_tool153
    add(f9_tool153_1.part, mode=Mode.SUBTRACT)


solid = f1_12.part
